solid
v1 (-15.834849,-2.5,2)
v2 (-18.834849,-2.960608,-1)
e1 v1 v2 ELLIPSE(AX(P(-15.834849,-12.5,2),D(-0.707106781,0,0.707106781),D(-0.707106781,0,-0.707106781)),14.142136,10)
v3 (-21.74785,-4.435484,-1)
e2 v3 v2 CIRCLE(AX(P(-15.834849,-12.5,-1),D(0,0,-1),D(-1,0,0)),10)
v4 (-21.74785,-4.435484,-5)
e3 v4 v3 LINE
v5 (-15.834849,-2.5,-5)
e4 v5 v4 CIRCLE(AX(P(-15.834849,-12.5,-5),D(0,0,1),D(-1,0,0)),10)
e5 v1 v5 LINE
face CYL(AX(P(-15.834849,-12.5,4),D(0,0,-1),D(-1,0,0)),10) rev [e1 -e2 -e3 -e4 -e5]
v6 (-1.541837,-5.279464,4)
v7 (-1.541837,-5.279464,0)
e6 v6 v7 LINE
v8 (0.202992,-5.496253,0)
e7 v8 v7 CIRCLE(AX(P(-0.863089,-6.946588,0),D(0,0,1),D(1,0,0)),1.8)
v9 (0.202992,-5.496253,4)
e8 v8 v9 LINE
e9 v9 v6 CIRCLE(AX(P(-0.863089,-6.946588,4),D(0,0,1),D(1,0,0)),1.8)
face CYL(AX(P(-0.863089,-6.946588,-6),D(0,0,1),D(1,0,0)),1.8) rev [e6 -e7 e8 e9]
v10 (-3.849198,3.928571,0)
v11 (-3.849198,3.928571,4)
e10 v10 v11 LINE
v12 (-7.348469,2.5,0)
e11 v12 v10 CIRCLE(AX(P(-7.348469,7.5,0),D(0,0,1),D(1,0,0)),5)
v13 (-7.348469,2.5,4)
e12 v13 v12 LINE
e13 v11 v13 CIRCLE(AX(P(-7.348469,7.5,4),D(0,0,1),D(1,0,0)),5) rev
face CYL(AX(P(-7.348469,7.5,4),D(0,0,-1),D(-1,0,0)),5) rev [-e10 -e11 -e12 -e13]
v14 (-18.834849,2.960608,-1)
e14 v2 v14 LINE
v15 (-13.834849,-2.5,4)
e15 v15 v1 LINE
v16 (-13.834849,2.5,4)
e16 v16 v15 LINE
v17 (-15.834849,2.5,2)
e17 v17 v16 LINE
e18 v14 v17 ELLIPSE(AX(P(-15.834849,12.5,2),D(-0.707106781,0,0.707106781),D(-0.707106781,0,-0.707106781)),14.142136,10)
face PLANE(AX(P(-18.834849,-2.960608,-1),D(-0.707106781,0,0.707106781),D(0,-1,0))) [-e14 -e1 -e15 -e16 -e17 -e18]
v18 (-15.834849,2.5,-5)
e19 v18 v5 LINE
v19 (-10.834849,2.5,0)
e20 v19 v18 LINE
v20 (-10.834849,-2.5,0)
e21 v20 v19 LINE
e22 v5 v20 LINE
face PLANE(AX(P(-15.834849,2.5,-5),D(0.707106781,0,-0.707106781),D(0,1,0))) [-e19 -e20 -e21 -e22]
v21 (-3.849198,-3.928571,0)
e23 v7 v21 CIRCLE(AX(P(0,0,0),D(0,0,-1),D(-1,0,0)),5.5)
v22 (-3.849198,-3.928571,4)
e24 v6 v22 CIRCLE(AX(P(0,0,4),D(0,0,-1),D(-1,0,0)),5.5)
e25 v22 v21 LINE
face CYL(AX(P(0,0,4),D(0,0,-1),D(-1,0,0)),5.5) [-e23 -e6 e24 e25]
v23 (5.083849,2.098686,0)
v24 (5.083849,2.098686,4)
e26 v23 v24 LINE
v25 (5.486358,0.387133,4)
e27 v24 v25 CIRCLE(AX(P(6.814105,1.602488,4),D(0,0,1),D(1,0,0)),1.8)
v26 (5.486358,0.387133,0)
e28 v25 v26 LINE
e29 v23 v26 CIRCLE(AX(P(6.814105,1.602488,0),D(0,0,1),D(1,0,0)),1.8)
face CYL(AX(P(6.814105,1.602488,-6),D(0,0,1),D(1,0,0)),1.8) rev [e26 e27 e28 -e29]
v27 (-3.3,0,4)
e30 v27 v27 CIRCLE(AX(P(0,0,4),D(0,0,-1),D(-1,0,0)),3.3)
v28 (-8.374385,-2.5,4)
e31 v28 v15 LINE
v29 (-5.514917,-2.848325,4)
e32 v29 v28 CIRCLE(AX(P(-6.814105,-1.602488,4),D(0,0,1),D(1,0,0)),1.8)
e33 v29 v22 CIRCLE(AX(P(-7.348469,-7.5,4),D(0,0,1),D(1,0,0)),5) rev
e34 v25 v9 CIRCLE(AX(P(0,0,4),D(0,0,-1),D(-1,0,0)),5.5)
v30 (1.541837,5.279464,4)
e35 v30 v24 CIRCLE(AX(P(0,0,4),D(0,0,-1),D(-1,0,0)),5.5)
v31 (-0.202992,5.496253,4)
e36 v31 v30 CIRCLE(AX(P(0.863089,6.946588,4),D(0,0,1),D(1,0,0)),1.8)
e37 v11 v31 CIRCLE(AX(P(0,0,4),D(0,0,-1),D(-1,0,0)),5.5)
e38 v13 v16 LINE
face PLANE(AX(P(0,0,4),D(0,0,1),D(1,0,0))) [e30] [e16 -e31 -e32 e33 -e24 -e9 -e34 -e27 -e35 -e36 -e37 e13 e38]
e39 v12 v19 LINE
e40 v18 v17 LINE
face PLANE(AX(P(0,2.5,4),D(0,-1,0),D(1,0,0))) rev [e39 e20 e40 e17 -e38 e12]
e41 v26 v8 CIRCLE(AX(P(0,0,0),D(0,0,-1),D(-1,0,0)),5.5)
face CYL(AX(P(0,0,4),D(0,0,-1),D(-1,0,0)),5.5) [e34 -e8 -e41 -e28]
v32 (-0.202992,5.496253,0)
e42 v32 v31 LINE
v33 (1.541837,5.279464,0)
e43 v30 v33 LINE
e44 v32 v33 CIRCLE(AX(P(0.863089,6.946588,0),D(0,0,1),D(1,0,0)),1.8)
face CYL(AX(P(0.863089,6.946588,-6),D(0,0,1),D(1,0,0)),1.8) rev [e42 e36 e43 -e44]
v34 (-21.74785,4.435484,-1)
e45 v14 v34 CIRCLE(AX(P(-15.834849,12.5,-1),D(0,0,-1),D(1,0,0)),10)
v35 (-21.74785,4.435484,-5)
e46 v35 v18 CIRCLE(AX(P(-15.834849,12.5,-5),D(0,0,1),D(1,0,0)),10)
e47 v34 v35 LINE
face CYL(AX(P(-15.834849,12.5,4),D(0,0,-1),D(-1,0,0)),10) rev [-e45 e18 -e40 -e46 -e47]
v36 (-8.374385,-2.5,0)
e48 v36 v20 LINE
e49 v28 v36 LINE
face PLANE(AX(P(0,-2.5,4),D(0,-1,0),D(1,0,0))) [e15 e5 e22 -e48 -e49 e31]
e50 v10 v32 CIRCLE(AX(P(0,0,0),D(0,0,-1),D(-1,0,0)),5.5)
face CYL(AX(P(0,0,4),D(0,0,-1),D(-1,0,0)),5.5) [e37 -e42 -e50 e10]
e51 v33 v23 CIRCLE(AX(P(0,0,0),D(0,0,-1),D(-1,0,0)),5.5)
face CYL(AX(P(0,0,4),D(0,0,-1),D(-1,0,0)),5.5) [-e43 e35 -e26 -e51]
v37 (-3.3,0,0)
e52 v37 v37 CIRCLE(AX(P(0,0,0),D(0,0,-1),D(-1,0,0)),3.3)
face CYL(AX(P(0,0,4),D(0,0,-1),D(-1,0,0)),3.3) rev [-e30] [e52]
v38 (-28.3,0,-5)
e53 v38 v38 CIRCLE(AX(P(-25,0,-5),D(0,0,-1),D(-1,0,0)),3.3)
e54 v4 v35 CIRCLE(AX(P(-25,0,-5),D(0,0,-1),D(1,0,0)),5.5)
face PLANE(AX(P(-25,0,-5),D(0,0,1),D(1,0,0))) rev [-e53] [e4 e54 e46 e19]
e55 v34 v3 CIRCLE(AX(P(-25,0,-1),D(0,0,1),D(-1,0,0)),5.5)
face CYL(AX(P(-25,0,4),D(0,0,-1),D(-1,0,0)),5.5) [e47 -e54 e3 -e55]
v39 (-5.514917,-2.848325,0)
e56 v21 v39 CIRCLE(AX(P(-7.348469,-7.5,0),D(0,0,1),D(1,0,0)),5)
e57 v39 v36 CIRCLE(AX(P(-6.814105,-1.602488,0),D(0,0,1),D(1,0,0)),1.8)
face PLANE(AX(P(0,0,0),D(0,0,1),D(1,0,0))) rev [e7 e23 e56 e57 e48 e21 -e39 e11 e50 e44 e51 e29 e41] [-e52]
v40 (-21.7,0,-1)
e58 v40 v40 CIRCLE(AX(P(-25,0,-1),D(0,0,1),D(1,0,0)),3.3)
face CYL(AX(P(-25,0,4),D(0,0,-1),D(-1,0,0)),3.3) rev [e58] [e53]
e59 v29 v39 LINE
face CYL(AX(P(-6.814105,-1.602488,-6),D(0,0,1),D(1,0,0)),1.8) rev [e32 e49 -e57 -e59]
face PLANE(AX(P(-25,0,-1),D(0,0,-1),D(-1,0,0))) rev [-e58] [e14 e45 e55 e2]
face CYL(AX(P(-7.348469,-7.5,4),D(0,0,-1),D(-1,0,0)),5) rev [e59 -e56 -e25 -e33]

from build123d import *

# Parameters (mm, degrees)
SKETCH_1_R          = 2
EXTRUDE_1_DEPTH     = 4
FILLET_1_R          = 10
FILLET_2_R          = 2
SKETCH_8_R          = 3.300000000000001
EXTRUDE_3_DEPTH     = 5
CHAMFER_1_SIZE      = 5
SKETCH_9_R          = 3.300000000000001
CUT_EXTRUDE_3_DEPTH = 5
CHAMFER_2_SIZE      = 5
SKETCH_10_R         = 5.5
SKETCH_10_R_2       = 3.3000000000000003
EXTRUDE_4_DEPTH     = 4
SKETCH_11_R         = 3.3000000000000007
CUT_EXTRUDE_4_DEPTH = 4
FILLET_3_R          = 5
SKETCH_12_R         = 1.7999999999999998
SKETCH_12_R_2       = 1.800000000000001
SKETCH_12_R_3       = 1.7999999999999972
SKETCH_12_R_4       = 1.8000000000000007
CUT_EXTRUDE_5_DEPTH = 10


with BuildPart() as part:
    # ｽｹｯﾁ1 → ﾎﾞｽ - 押し出し1 (new body)
    # profile 1 of 5: a face of its own
    with BuildSketch(Plane.XY):
        with BuildLine():
            ThreePointArc((-27.5, 2.1540659228538024), (-27.33345237791561, 2.333452377915602), (-27.15406592285381, 2.49999999999999))
            Line((-27.154065922853814, 2.499999999999997), (-27.499999999999996, 2.499999999999997))
            Line((-27.499999999999996, 2.499999999999997), (-27.499999999999996, 2.154065922853802))
        make_face()
    # profile 2 of 5: a face of its own
    with BuildSketch(Plane.XY):
        with BuildLine():
            Line((-27.5, -2.500000000000003), (-27.154065922853817, -2.500000000000003))
            ThreePointArc((-27.154065922853817, -2.499999999999992), (-27.333452377915613, -2.3334523779156044), (-27.5, -2.1540659228538055))
            Line((-27.5, -2.1540659228538055), (-27.5, -2.500000000000003))
        make_face()
    # profile 3 of 5: a face of its own
    with BuildSketch(Plane.XY):
        with BuildLine():
            ThreePointArc((-20.10102051443362, 2.49999999999994), (-30.499999999999996, -2.39e-15), (-20.101020514433618, -2.4999999999999454))
            Line((-20.1010205144336, -2.500000000000002), (-22.84593407714621, -2.5000000000000027))
            ThreePointArc((-22.845934077146207, -2.5000000000000133), (-25.000000000000018, -3.3000000000000043), (-27.154065922853817, -2.499999999999992))
            Line((-27.154065922853817, -2.500000000000003), (-27.5, -2.500000000000003))
            Line((-27.5, -2.500000000000003), (-27.5, -2.1540659228538055))
            ThreePointArc((-27.5, -2.1540659228538055), (-28.3, -1.19e-15), (-27.5, 2.1540659228538024))
            Line((-27.499999999999996, 2.154065922853802), (-27.499999999999996, 2.499999999999997))
            Line((-27.499999999999996, 2.499999999999997), (-27.154065922853814, 2.499999999999997))
            ThreePointArc((-27.15406592285381, 2.49999999999999), (-25.000000000000014, 3.299999999999998), (-22.845934077146207, 2.500000000000007))
            Line((-22.84593407714621, 2.4999999999999982), (-20.1010205144336, 2.4999999999999987))
        make_face()
    # profile 4 of 5: a face of its own
    with BuildSketch(Plane.XY):
        with BuildLine():
            Line((-22.84593407714621, -2.5000000000000027), (-20.1010205144336, -2.500000000000002))
            ThreePointArc((-20.101020514433618, -2.4999999999999454), (-19.652365608485606, -1.2856151891963796), (-19.500000000000004, -4.41e-15))
            ThreePointArc((-19.500000000000004, -3.06e-15), (-19.652365608485606, 1.2856151891963756), (-20.10102051443362, 2.49999999999994))
            Line((-20.1010205144336, 2.4999999999999987), (-22.84593407714621, 2.4999999999999982))
            ThreePointArc((-22.845934077146207, 2.5000000000000067), (-22.00013187411367, 1.3750604449591433), (-21.7, -3.06e-15))
            ThreePointArc((-21.7, -3.87e-15), (-22.00013187411367, -1.3750604449591517), (-22.845934077146207, -2.5000000000000133))
        make_face()
    # profile 5 of 5: a face of its own
    with BuildSketch(Plane.XY):
        with BuildLine():
            Line((-20.1010205144336, -2.500000000000002), (2.5, -2.4999999999999996))
            Line((2.5, -2.4999999999999996), (2.499999999999999, 2.500000000000005))
            Line((2.499999999999999, 2.500000000000005), (-20.1010205144336, 2.4999999999999987))
            ThreePointArc((-20.10102051443362, 2.49999999999994), (-19.652365608485606, 1.2856151891963756), (-19.500000000000004, -3.06e-15))
            ThreePointArc((-19.500000000000004, -4.41e-15), (-19.652365608485606, -1.2856151891963796), (-20.101020514433618, -2.4999999999999454))
        make_face()
        Circle(SKETCH_1_R, mode=Mode.SUBTRACT)
    extrude(amount=EXTRUDE_1_DEPTH)

    # ﾌｨﾚｯﾄ1
    fillet_1_edges = [part.edges().sort_by_distance(p)[0] for p in [
        (-20.10102051443361, 2.4999999999999694, 2),
        (-20.10102051443361, -2.4999999999999742, 2),
    ]]
    fillet(fillet_1_edges, radius=FILLET_1_R)

    # ﾌｨﾚｯﾄ2
    fillet_2_edges = [part.edges().sort_by_distance(p)[0] for p in [
        (2.499999999999999, 2.500000000000005, 2),
        (2.5, -2.4999999999999996, 2),
    ]]
    fillet(fillet_2_edges, radius=FILLET_2_R)

    # ｽｹｯﾁ8 → ﾎﾞｽ - 押し出し3 (add)
    with BuildSketch(Plane(origin=(0, 0, 0), x_dir=(-1, 0, 0), z_dir=(0, 0, -1))):
        with BuildLine():
            Line((15.83484861008833, 2.5), (15.834848610088294, -2.500000000000004))
            ThreePointArc((15.834848610088294, -2.500000000000004), (18.945703694279587, -2.996180733770167), (21.747849506805537, -4.435483870967743))
            ThreePointArc((21.747849506805537, -4.435483870967743), (30.499999999999996, -3.06e-15), (21.747849506805537, 4.435483870967737))
            ThreePointArc((21.747849506805537, 4.435483870967737), (18.9457036942796, 2.996180733770169), (15.83484861008833, 2.5))
        make_face()
        with Locations((25, -3.06e-15)):
            Circle(SKETCH_8_R, mode=Mode.SUBTRACT)
    extrude(amount=EXTRUDE_3_DEPTH)

    # 面取り1
    chamfer_1_edges = [part.edges().sort_by_distance(p)[0] for p in [
        (-15.834848610088311, -1.78e-15, 0),
    ]]
    chamfer(chamfer_1_edges, length=CHAMFER_1_SIZE - 0.0001)  # a hair under: the kernel refuses the full size

    # ｽｹｯﾁ9 → ｶｯﾄ - 押し出し3 (cut)
    with BuildSketch(Plane.XY.offset(4)):
        with BuildLine():
            Line((-18.834848610088333, -2.960607985830548), (-18.83484861008833, 2.9606079858305425))
            ThreePointArc((-18.83484861008833, 2.9606079858305425), (-20.351950663989726, 3.5783527846792875), (-21.747849506805537, 4.435483870967737))
            ThreePointArc((-21.747849506805537, 4.435483870967737), (-30.499999999999996, -1.29e-15), (-21.747849506805537, -4.435483870967743))
            ThreePointArc((-21.747849506805537, -4.435483870967743), (-20.35195066398973, -3.5783527846792946), (-18.834848610088333, -2.960607985830548))
        make_face()
        with Locations(Location((-25, -3.06e-15, 0), (0, 0, 180))):
            Circle(SKETCH_9_R, mode=Mode.SUBTRACT)
    extrude(amount=-CUT_EXTRUDE_3_DEPTH, mode=Mode.SUBTRACT)

    # 面取り2
    chamfer_2_edges = [part.edges().sort_by_distance(p)[0] for p in [
        (-18.83484861008833, -2.66e-15, 4),
    ]]
    chamfer(chamfer_2_edges, length=CHAMFER_2_SIZE - 0.0001)  # a hair under: the kernel refuses the full size

    # ｽｹｯﾁ10 → ﾎﾞｽ - 押し出し4 (add)
    with BuildSketch(Plane(origin=(0, 0, 0), x_dir=(-1, 0, 0), z_dir=(0, 0, -1))):
        Circle(SKETCH_10_R)
        Circle(SKETCH_10_R_2, mode=Mode.SUBTRACT)
    extrude(amount=-EXTRUDE_4_DEPTH)

    # ｽｹｯﾁ11 → ｶｯﾄ - 押し出し4 (cut)
    with BuildSketch(Plane(origin=(0, 0, 0), x_dir=(-1, 0, 0), z_dir=(0, 0, -1))):
        Circle(SKETCH_11_R)
    extrude(amount=-CUT_EXTRUDE_4_DEPTH, mode=Mode.SUBTRACT)

    # ﾌｨﾚｯﾄ3
    fillet_3_edges = [part.edges().sort_by_distance(p)[0] for p in [
        (-4.898979485566355, 2.5000000000000027, 2),
        (-4.898979485566356, -2.5000000000000004, 2),
    ]]
    fillet(fillet_3_edges, radius=FILLET_3_R)

    # ｽｹｯﾁ12 → ｶｯﾄ - 押し出し5 (cut)
    with BuildSketch(Plane.XY.offset(4)):
        with Locations((-6.8141053858085305, -1.6024880002863613)):
            Circle(SKETCH_12_R)
        with Locations((-0.8630886568357895, -6.946587505419047)):
            Circle(SKETCH_12_R_2)
        with Locations((6.814105385815693, 1.6024880002767492)):
            Circle(SKETCH_12_R_3)
        with Locations((0.8630886568356403, 6.946587505418688)):
            Circle(SKETCH_12_R_4)
    extrude(amount=-CUT_EXTRUDE_5_DEPTH, mode=Mode.SUBTRACT)


solid = part.part
